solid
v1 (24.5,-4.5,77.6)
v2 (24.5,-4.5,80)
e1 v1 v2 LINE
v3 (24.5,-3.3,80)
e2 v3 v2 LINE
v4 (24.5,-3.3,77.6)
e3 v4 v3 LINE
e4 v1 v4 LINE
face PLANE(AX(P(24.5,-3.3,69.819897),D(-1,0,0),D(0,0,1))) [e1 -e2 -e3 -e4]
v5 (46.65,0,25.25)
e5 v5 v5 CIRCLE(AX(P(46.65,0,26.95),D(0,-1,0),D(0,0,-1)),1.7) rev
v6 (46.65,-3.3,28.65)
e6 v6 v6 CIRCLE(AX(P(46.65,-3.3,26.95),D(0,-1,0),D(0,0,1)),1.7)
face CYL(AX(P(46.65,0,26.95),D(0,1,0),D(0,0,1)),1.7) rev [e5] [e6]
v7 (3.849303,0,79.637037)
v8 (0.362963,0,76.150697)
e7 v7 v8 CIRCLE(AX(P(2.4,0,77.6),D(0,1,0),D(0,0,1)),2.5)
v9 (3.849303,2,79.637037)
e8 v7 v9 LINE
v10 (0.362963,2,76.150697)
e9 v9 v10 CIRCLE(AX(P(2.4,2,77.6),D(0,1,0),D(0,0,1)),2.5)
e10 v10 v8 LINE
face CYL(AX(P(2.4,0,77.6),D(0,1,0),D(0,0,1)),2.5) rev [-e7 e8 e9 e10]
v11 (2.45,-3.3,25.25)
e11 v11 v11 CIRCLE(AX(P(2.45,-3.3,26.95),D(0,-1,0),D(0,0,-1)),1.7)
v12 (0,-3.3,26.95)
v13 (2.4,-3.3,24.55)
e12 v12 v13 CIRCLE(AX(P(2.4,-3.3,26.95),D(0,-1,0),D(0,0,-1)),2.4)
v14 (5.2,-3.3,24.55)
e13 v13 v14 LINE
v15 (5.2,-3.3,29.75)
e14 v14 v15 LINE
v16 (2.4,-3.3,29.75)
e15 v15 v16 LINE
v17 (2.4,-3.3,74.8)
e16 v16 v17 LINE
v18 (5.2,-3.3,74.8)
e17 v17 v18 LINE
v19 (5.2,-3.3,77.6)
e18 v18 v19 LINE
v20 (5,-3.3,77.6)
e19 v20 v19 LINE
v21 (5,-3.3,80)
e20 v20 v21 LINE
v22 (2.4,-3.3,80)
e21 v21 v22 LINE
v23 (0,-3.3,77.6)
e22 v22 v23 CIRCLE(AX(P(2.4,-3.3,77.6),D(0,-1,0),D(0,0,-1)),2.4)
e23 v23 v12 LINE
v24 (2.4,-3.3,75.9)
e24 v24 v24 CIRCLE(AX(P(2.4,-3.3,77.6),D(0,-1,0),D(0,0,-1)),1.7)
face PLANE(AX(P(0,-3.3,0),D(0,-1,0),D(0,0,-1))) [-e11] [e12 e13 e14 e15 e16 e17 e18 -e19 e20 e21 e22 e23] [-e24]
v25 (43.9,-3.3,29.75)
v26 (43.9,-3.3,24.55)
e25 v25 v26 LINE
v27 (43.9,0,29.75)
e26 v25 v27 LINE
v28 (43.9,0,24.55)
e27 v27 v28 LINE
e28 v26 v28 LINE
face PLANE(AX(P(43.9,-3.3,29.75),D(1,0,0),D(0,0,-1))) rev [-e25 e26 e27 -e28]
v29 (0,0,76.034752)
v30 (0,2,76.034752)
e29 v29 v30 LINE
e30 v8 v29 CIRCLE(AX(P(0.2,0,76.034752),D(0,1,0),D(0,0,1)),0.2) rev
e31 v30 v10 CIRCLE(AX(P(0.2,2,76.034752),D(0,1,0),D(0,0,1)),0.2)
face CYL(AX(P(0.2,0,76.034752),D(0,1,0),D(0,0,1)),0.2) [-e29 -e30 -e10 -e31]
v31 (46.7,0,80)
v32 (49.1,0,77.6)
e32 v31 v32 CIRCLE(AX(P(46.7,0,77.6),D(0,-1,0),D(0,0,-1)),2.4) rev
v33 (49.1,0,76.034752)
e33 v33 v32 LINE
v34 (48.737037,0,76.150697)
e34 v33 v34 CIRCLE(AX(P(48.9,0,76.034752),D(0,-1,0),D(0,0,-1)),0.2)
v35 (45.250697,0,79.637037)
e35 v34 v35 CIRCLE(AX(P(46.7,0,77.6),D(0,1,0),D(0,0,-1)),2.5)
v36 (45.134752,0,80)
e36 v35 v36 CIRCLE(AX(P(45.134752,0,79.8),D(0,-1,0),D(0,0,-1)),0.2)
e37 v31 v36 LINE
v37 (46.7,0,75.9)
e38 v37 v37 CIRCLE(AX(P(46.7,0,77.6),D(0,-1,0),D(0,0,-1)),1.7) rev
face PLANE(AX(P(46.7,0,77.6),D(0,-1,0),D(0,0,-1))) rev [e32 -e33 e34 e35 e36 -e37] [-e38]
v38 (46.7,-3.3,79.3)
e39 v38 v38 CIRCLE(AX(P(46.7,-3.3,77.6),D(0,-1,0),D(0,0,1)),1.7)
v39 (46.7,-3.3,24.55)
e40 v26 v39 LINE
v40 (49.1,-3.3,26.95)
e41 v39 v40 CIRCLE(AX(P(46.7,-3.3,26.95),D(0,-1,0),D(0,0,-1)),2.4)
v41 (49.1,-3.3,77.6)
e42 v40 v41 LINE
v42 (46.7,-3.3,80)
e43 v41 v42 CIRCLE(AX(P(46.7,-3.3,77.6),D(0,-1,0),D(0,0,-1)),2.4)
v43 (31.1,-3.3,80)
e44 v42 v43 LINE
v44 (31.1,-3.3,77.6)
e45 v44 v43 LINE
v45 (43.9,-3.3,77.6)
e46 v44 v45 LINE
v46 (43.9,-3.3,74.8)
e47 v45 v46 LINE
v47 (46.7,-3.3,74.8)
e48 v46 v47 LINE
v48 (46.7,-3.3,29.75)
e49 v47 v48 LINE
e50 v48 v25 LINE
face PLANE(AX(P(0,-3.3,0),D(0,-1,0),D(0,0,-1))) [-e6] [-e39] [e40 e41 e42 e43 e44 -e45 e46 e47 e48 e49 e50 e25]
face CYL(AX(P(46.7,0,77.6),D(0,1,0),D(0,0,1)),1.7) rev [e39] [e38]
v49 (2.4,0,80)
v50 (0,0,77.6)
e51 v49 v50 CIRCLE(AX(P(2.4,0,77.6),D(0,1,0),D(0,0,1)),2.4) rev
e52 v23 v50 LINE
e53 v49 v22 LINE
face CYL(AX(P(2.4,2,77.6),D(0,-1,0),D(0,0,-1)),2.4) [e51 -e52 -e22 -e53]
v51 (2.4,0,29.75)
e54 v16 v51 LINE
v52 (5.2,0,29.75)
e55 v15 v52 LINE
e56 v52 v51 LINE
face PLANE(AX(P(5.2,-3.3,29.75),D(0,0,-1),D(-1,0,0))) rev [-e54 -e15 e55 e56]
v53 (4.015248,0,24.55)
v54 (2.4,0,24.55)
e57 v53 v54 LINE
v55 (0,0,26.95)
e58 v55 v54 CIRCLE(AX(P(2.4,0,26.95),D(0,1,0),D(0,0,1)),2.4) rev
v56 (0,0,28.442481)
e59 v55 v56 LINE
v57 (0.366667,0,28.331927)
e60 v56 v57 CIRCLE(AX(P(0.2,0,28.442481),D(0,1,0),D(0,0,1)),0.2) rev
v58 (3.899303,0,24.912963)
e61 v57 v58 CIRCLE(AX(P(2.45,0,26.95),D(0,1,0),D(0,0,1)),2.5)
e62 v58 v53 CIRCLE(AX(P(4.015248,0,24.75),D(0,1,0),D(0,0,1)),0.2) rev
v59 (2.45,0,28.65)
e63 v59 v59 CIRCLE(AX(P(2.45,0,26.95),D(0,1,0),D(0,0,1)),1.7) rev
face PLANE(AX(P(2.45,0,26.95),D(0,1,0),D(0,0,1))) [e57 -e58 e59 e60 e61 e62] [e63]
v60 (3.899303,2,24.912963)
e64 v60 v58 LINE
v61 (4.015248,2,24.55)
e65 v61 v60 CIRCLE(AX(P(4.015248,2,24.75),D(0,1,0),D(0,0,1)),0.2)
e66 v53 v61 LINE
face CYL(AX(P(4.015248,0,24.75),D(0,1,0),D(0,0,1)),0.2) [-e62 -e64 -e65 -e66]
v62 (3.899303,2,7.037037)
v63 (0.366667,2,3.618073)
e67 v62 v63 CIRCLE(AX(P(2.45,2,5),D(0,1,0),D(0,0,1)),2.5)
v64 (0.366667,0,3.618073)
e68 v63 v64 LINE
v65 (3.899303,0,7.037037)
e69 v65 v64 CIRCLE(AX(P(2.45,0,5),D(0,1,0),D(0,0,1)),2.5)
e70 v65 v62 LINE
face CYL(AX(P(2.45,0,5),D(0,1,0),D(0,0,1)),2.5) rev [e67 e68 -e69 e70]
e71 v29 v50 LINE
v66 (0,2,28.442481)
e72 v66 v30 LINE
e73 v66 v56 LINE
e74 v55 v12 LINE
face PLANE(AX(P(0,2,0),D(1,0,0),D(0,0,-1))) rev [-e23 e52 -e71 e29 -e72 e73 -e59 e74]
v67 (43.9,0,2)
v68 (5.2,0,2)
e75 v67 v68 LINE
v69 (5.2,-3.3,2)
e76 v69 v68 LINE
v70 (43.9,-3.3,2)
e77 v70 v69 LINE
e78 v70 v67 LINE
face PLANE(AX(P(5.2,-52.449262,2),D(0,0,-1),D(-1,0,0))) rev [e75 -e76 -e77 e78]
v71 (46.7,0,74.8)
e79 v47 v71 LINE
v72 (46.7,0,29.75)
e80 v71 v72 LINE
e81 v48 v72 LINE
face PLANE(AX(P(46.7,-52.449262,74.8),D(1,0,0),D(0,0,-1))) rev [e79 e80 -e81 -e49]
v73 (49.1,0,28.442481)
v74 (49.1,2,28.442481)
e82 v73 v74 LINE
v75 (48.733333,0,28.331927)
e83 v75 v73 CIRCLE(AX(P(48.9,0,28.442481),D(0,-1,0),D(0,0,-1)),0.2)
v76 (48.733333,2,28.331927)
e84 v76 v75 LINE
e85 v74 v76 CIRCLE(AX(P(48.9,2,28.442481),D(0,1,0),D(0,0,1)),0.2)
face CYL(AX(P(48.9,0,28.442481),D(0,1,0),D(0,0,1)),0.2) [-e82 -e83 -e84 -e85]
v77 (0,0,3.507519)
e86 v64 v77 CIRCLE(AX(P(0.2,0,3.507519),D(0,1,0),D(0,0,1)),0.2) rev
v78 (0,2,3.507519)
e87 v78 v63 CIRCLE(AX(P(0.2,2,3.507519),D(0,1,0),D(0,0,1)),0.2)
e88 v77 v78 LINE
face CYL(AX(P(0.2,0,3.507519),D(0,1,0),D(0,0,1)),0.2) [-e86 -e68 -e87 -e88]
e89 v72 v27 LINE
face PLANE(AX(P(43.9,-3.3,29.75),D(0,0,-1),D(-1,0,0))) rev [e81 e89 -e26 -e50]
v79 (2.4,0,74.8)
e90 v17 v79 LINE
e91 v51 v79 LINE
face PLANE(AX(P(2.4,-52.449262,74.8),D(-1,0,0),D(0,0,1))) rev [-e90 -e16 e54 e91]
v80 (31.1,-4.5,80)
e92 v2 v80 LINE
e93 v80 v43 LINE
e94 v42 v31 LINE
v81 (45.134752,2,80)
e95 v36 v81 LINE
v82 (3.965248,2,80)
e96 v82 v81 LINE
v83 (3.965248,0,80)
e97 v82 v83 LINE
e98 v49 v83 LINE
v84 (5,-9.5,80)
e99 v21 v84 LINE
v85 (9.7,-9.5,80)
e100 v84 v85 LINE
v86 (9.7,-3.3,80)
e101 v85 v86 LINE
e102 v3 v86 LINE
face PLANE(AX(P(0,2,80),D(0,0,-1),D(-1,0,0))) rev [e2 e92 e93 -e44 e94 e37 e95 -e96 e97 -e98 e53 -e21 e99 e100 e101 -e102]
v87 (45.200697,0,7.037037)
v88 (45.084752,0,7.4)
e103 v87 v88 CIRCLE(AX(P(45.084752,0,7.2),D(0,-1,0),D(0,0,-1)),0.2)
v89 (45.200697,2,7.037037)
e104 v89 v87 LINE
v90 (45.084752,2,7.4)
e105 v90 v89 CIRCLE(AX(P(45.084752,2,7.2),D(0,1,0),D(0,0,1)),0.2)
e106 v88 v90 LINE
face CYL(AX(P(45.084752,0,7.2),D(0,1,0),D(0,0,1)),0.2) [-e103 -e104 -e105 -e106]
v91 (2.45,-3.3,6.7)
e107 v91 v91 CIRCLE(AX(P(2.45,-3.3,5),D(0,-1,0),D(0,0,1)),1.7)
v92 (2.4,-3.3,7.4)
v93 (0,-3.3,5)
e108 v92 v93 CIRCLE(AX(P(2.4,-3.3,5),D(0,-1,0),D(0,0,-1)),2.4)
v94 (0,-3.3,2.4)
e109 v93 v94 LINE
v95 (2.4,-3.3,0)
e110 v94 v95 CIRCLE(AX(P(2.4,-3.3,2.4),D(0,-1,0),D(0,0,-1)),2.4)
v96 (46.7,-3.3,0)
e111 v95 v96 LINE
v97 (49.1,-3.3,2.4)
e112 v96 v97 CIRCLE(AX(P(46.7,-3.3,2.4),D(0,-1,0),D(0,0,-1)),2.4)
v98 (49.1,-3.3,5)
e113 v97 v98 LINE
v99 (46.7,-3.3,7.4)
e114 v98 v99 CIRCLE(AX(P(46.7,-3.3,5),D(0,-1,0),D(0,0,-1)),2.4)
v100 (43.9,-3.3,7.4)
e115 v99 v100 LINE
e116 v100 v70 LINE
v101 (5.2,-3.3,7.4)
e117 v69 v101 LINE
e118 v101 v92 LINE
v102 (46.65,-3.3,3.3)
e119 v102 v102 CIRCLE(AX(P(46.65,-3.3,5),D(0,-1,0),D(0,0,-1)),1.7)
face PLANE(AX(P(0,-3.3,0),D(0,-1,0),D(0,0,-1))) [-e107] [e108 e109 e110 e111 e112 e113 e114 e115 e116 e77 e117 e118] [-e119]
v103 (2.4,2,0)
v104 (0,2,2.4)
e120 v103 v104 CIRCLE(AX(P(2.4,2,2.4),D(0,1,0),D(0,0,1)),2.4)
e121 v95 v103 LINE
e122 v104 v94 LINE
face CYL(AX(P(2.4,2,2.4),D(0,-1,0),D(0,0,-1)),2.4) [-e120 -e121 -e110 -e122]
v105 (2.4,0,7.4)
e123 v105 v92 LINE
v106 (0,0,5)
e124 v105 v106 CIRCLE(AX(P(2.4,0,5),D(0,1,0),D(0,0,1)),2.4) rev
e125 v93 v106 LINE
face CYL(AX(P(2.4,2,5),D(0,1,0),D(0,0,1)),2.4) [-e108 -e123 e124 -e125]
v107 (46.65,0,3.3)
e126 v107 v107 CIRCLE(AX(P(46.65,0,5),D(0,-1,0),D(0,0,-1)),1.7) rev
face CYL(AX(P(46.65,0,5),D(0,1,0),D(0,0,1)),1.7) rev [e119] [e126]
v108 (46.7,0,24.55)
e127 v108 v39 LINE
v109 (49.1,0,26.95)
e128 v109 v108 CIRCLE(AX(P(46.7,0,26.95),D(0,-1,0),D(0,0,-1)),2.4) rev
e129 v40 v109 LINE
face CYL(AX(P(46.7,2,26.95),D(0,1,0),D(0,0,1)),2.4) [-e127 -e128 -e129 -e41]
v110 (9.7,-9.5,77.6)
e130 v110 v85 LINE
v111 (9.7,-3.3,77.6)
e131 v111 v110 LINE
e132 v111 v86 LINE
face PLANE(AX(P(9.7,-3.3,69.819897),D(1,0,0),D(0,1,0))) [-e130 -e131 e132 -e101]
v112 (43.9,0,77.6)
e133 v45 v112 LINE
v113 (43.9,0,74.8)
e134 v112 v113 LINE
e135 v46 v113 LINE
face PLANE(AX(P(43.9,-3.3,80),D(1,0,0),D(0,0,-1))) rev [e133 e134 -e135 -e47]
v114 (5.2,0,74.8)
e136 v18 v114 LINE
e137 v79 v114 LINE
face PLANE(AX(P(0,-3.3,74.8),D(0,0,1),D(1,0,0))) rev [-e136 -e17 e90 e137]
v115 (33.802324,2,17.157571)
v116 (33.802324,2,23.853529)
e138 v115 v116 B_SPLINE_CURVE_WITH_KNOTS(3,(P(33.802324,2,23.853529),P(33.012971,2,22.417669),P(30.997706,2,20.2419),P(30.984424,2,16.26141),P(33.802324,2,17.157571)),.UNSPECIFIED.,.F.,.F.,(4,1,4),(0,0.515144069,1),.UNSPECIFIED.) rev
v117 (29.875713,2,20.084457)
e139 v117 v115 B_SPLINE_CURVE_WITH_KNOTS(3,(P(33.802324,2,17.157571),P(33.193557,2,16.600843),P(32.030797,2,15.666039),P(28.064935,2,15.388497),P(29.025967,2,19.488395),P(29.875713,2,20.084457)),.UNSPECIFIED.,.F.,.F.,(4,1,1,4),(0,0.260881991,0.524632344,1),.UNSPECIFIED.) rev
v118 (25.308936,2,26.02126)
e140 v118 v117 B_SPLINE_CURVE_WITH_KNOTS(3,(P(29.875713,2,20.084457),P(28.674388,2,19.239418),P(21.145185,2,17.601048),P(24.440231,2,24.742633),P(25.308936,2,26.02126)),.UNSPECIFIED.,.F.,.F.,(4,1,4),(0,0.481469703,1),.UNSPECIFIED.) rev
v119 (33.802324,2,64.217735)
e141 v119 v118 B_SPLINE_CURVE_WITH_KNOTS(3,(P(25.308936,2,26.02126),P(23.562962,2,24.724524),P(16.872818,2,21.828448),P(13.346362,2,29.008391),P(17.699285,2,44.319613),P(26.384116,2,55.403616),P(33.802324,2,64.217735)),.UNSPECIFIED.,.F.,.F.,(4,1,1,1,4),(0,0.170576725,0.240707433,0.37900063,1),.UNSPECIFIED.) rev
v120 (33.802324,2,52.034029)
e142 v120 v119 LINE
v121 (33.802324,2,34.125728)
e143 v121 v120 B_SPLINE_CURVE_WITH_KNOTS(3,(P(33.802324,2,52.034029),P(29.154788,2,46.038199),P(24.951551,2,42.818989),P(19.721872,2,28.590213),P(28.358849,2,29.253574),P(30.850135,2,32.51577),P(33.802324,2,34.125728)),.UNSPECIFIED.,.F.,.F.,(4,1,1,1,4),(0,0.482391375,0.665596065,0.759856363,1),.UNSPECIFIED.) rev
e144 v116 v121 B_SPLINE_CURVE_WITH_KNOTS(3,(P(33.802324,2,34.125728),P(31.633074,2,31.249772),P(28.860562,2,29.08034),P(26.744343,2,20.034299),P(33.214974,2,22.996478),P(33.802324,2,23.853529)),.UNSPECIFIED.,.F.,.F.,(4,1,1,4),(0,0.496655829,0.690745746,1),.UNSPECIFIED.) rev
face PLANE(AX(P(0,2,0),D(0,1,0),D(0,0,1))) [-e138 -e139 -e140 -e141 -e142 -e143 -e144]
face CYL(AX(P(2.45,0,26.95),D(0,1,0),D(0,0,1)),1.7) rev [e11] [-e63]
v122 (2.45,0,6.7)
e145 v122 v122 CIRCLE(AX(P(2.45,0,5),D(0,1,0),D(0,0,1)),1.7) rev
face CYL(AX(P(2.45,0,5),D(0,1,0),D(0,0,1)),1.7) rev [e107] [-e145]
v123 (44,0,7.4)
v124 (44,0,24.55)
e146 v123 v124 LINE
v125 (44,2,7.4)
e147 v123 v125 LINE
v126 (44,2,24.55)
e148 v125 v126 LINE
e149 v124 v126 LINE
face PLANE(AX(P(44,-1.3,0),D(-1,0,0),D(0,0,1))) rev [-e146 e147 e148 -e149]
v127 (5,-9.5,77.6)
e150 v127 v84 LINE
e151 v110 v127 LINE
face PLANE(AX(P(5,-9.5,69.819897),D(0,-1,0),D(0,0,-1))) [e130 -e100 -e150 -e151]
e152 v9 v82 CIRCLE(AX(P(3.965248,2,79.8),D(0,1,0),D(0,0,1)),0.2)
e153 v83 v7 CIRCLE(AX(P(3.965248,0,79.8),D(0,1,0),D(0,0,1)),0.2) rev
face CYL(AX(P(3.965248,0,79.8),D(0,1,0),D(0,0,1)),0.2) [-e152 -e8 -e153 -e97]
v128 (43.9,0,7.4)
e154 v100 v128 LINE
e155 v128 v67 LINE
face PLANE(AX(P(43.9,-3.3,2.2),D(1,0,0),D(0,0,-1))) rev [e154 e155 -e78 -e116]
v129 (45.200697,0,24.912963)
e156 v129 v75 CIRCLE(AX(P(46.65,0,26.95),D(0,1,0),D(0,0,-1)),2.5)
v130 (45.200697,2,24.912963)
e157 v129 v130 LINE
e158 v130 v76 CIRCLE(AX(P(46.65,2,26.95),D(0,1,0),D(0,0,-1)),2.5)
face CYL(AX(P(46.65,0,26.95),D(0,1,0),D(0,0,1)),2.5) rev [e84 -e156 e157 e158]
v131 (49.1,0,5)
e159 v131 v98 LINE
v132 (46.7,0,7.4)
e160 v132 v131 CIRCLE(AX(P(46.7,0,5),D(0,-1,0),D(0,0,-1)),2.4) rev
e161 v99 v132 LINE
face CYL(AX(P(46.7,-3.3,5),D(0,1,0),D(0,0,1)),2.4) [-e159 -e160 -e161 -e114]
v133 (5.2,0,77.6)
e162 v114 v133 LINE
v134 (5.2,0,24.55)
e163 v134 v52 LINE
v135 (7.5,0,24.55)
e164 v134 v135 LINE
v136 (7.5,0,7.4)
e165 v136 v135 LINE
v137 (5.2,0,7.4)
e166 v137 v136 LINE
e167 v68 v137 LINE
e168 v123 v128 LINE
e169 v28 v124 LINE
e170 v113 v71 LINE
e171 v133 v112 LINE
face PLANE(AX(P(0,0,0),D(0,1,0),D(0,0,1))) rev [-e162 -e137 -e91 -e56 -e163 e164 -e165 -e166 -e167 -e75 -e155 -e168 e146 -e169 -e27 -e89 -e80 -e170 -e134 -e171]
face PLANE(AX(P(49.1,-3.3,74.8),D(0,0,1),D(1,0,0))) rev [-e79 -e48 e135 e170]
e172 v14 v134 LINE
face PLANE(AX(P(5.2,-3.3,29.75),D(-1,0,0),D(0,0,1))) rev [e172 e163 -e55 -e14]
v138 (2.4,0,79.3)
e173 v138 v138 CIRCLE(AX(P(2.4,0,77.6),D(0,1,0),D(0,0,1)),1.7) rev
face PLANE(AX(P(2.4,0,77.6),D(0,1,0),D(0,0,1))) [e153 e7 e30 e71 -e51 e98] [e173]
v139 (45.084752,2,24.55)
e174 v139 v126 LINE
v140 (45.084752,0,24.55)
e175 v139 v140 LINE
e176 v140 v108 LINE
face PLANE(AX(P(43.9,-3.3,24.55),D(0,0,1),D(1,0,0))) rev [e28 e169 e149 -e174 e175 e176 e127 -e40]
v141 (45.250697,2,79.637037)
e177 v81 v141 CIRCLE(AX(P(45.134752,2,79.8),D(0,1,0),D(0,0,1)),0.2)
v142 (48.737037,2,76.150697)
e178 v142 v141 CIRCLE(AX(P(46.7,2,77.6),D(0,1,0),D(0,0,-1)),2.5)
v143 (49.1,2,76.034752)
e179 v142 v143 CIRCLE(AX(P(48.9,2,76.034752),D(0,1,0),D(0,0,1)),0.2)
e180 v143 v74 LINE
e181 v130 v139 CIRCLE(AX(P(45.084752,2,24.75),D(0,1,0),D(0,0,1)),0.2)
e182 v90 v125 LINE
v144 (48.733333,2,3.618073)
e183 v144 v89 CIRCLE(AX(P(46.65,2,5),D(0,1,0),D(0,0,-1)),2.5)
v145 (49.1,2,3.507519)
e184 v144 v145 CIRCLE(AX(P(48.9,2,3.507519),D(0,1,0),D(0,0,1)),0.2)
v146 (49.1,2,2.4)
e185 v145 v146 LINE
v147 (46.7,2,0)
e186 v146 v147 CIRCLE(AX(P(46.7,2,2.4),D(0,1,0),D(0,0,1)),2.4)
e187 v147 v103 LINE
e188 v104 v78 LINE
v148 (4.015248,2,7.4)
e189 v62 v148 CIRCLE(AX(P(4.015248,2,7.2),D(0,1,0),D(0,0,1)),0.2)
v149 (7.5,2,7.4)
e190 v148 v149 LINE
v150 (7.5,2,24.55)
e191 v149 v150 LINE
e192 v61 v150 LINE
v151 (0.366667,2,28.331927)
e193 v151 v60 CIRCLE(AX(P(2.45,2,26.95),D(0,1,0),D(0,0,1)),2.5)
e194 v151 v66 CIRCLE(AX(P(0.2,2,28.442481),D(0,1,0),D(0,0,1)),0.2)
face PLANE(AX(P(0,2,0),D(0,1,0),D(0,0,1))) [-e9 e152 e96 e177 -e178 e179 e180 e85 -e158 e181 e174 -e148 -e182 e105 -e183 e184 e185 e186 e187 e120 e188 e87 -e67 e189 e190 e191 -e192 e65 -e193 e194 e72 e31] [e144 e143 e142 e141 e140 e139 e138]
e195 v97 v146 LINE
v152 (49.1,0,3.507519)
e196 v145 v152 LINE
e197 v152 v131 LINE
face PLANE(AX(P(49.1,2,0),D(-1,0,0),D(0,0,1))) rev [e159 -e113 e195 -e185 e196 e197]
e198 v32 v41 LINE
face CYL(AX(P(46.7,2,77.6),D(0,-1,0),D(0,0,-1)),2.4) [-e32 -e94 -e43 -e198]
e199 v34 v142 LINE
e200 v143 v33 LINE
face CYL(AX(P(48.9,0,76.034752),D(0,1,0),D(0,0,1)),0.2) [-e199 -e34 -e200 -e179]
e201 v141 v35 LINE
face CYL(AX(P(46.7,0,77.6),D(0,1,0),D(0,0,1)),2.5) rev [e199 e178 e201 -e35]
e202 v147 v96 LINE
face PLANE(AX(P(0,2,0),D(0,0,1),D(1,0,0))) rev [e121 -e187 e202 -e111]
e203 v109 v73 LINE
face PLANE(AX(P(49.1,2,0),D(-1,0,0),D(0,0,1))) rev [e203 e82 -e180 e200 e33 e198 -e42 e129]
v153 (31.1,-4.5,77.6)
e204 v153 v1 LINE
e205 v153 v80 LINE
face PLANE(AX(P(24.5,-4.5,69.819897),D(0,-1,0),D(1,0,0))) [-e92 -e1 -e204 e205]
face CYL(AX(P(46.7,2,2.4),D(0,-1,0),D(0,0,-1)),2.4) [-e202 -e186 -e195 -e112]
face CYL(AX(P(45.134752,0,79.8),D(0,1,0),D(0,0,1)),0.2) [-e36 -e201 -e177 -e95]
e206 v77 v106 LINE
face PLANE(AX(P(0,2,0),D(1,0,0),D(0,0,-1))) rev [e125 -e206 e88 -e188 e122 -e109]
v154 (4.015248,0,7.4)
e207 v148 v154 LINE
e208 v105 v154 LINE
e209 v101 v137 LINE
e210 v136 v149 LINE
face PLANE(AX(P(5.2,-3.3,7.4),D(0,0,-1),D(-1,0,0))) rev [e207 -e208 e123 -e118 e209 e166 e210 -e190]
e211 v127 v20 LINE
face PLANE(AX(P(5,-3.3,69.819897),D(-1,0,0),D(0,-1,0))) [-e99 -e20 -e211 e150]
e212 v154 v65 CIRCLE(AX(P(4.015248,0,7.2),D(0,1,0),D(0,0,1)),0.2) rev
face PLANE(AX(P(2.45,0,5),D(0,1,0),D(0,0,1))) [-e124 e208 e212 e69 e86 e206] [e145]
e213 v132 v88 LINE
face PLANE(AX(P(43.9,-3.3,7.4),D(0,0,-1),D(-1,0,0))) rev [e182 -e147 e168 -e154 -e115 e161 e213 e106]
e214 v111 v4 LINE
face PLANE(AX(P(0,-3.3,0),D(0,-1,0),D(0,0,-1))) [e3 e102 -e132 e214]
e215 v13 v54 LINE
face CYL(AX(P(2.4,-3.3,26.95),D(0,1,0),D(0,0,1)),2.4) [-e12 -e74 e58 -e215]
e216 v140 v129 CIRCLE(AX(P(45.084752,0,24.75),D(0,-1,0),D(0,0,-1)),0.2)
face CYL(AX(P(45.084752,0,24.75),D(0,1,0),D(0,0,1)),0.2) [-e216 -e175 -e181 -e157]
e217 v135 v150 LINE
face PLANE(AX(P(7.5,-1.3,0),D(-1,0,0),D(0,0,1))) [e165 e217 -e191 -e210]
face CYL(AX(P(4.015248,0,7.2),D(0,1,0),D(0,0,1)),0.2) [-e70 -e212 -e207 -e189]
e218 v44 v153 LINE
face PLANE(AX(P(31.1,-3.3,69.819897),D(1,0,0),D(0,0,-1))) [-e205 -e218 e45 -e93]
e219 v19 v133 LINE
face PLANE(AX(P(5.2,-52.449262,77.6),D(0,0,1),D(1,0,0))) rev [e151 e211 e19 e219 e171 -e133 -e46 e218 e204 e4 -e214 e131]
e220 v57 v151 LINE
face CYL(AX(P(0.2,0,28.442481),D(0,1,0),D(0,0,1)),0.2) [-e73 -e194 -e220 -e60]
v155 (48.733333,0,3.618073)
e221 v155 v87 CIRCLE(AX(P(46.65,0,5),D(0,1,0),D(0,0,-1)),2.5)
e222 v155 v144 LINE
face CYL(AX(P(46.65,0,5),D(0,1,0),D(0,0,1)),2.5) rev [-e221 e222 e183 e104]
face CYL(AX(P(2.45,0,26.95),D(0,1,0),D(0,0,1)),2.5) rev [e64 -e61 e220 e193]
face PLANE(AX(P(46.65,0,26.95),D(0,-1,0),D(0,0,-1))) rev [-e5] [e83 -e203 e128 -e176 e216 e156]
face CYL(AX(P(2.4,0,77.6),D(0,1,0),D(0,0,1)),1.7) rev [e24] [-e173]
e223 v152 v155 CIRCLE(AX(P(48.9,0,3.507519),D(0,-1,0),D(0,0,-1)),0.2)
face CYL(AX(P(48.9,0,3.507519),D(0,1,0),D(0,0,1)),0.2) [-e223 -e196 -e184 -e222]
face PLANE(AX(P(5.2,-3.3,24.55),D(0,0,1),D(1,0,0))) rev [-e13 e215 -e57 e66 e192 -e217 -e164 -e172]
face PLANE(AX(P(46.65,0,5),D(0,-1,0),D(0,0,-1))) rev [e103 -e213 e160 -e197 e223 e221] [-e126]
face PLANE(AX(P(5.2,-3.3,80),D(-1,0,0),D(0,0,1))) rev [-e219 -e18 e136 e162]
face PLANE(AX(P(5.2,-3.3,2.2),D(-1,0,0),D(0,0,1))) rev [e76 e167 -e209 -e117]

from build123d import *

# Parameters (mm, degrees)
SKETCH1_W           = 49.1
SKETCH1_H           = 80
BOSS_EXTRUDE1_DEPTH = 2
SKETCH2_R           = 1.7
CUT_EXTRUDE1_DEPTH  = 2
SKETCH3_W           = 5.2
SKETCH3_H           = 5.2
SKETCH3_R           = 1.7
BOSS_EXTRUDE2_DEPTH = 3.3
SKETCH4_W           = 7.5
SKETCH4_H           = 17.15
SKETCH4_W_2         = 5.1
CUT_EXTRUDE2_DEPTH  = 3.3
SKETCH7_W           = 38.7
SKETCH7_H           = 2.4
SKETCH7_W_2         = 2.4
SKETCH7_H_2         = 45.05
BOSS_EXTRUDE4_DEPTH = 3.3
SKETCH8_W           = 6.6
SKETCH8_H           = 1.2
SKETCH8_W_2         = 4.7
SKETCH8_H_2         = 6.2
BOSS_EXTRUDE5_DEPTH = 2.4
FILLET1_START       = -9.5
FILLET1_DEPTH       = 12.5
SKETCH9_R           = 2.5
CUT_EXTRUDE3_DEPTH  = 2
FILLET2_R           = 0.2


with BuildPart() as part:
    # Sketch1 → Boss-Extrude1 (new body)
    with BuildSketch(Plane(origin=(0, 0, 0), x_dir=(1, 0, 0), z_dir=(0, 1, 0))):
        with Locations((24.55, -40)):
            Rectangle(SKETCH1_W, SKETCH1_H)
    extrude(amount=BOSS_EXTRUDE1_DEPTH)

    # Sketch2 → Cut-Extrude1 (cut)
    with BuildSketch(Plane(origin=(0, 2, 0), x_dir=(1, 0, 0), z_dir=(0, 1, 0))):
        with Locations(Location((2.4, -77.6, 0), (0, 0, 270))):
            Circle(SKETCH2_R)
        with Locations(Location((2.45, -26.95, 0), (0, 0, 270))):
            Circle(SKETCH2_R)
        with Locations(Location((2.45, -5, 0), (0, 0, 270))):
            Circle(SKETCH2_R)
        with Locations(Location((46.7, -77.6, 0), (0, 0, 90))):
            Circle(SKETCH2_R)
        with Locations(Location((46.65, -26.95, 0), (0, 0, 90))):
            Circle(SKETCH2_R)
        with Locations(Location((46.65, -5, 0), (0, 0, 90))):
            Circle(SKETCH2_R)
    extrude(amount=-CUT_EXTRUDE1_DEPTH, mode=Mode.SUBTRACT)

    # Sketch3 → Boss-Extrude2 (add)
    # profile 1 of 6: a face of its own
    with BuildSketch(Plane.XZ):
        with Locations((2.6, 77.4)):
            Rectangle(SKETCH3_W, SKETCH3_H)
        with Locations(Location((2.4, 77.6, 0), (0, 0, 90))):
            Circle(SKETCH3_R, mode=Mode.SUBTRACT)
    # profile 2 of 6: a face of its own
    with BuildSketch(Plane.XZ):
        with Locations((2.6, 27.15)):
            Rectangle(SKETCH3_W, SKETCH3_H)
        with Locations(Location((2.45, 26.95, 0), (0, 0, 90))):
            Circle(SKETCH3_R, mode=Mode.SUBTRACT)
    # profile 3 of 6: a face of its own
    with BuildSketch(Plane.XZ):
        with Locations((2.6, 4.8)):
            Rectangle(SKETCH3_W, SKETCH3_H)
        with Locations(Location((2.45, 5, 0), (0, 0, 90))):
            Circle(SKETCH3_R, mode=Mode.SUBTRACT)
    # profile 4 of 6: a face of its own
    with BuildSketch(Plane.XZ):
        with Locations((46.5, 4.8)):
            Rectangle(SKETCH3_W, SKETCH3_H)
        with Locations(Location((46.65, 5, 0), (0, 0, 270))):
            Circle(SKETCH3_R, mode=Mode.SUBTRACT)
    # profile 5 of 6: a face of its own
    with BuildSketch(Plane.XZ):
        with Locations((46.5, 27.15)):
            Rectangle(SKETCH3_W, SKETCH3_H)
        with Locations(Location((46.65, 26.95, 0), (0, 0, 90))):
            Circle(SKETCH3_R, mode=Mode.SUBTRACT)
    # profile 6 of 6: a face of its own
    with BuildSketch(Plane.XZ):
        with Locations((46.5, 77.4)):
            Rectangle(SKETCH3_W, SKETCH3_H)
        with Locations(Location((46.7, 77.6, 0), (0, 0, 90))):
            Circle(SKETCH3_R, mode=Mode.SUBTRACT)
    extrude(amount=BOSS_EXTRUDE2_DEPTH)

    # Sketch4 → Cut-Extrude2 (cut)
    with BuildSketch(Plane(origin=(0, 2, 0), x_dir=(1, 0, 0), z_dir=(0, 1, 0))):
        with Locations((3.75, -15.975)):
            Rectangle(SKETCH4_W, SKETCH4_H)
        with Locations((46.55, -15.975)):
            Rectangle(SKETCH4_W_2, SKETCH4_H)
    extrude(amount=-CUT_EXTRUDE2_DEPTH, mode=Mode.SUBTRACT)

    # Sketch7 → Boss-Extrude4 (add)
    with BuildSketch(Plane.XZ):
        with Locations((24.55, 78.8)):
            Rectangle(SKETCH7_W, SKETCH7_H)
        with Locations((47.9, 52.275)):
            Rectangle(SKETCH7_W_2, SKETCH7_H_2)
        with Locations((1.2, 52.275)):
            Rectangle(SKETCH7_W_2, SKETCH7_H_2)
        Polygon((0, 0), (49.1, 0), (49.1, 2), (49.1, 2.2), (43.9, 2.2), (43.9, 2), (5.2, 2), (5.2, 2.2), (0, 2.2), (0, 2), align=None)
    extrude(amount=BOSS_EXTRUDE4_DEPTH)

    # Sketch8 → Boss-Extrude5 (add)
    with BuildSketch(Plane.XY.offset(80)):
        with Locations((27.8, -3.9)):
            Rectangle(SKETCH8_W, SKETCH8_H)
        with Locations((7.35, -6.4)):
            Rectangle(SKETCH8_W_2, SKETCH8_H_2)
    extrude(amount=-BOSS_EXTRUDE5_DEPTH)

    # Fillet1: read off the stored shape, not the designer's step
    # Fillet1 outline → Fillet1 (cut)
    with BuildSketch(Plane(origin=(0, 0, 0), x_dir=(1, 0, 0), z_dir=(0, 1, 0)).offset(FILLET1_START)):
        with BuildLine():
            Line((0, 0), (0, -2.4))
            ThreePointArc((0, -2.4), (0.702943725, -0.702943725), (2.4, 0))
            Line((2.4, 0), (0, 0))
        make_face()
        with BuildLine():
            ThreePointArc((2.4, -7.4), (0.702943725, -6.697056275), (0, -5))
            Line((0, -5), (0, -7.4))
            Line((0, -7.4), (2.4, -7.4))
        make_face()
        with BuildLine():
            Line((49.1, -7.4), (49.1, -5))
            ThreePointArc((49.1, -5), (48.397056275, -6.697056275), (46.7, -7.4))
            Line((46.7, -7.4), (49.1, -7.4))
        make_face()
        with BuildLine():
            Line((49.1, 0), (46.7, 0))
            ThreePointArc((46.7, 0), (48.397056275, -0.702943725), (49.1, -2.4))
            Line((49.1, -2.4), (49.1, 0))
        make_face()
        with BuildLine():
            Line((0, -80), (2.4, -80))
            ThreePointArc((2.4, -80), (0.702943725, -79.297056275), (0, -77.6))
            Line((0, -77.6), (0, -80))
        make_face()
        with BuildLine():
            ThreePointArc((46.7, -24.55), (48.397056275, -25.252943725), (49.1, -26.95))
            Line((49.1, -26.95), (49.1, -24.55))
            Line((49.1, -24.55), (46.7, -24.55))
        make_face()
        with BuildLine():
            ThreePointArc((49.1, -77.6), (48.397056275, -79.297056275), (46.7, -80))
            Line((46.7, -80), (49.1, -80))
            Line((49.1, -80), (49.1, -77.6))
        make_face()
        with BuildLine():
            Line((0, -24.55), (0, -26.95))
            ThreePointArc((0, -26.95), (0.702943725, -25.252943725), (2.4, -24.55))
            Line((2.4, -24.55), (0, -24.55))
        make_face()
    extrude(amount=FILLET1_DEPTH, mode=Mode.SUBTRACT)

    # Sketch9 → Cut-Extrude3 (cut)
    with BuildSketch(Plane(origin=(0, 2, 0), x_dir=(1, 0, 0), z_dir=(0, 1, 0))):
        with Locations((2.45, -5)):
            Circle(SKETCH9_R)
        with Locations((2.45, -26.95)):
            Circle(SKETCH9_R)
        with Locations((2.4, -77.6)):
            Circle(SKETCH9_R)
        with Locations((46.7, -77.6)):
            Circle(SKETCH9_R)
        with Locations((46.65, -26.95)):
            Circle(SKETCH9_R)
        with Locations((46.65, -5)):
            Circle(SKETCH9_R)
    extrude(amount=-CUT_EXTRUDE3_DEPTH, mode=Mode.SUBTRACT)

    # Fillet2
    fillet2_edges = [part.edges().sort_by_distance(p)[0] for p in [
        (45.95, 1, 24.55),
        (45.95, 1, 7.4),
        (3.15, 1, 7.4),
        (3.15, 1, 24.55),
        (49.1, 1, 4.502506281),
        (49.1, 1, 27.447493719),
        (49.1, 1, 76.9),
        (46, 1, 80),
        (0, 1, 76.9),
        (3.1, 1, 80),
        (0, 1, 27.447493719),
        (0, 1, 4.502506281),
    ]]
    fillet(fillet2_edges, radius=FILLET2_R)


solid = part.part
